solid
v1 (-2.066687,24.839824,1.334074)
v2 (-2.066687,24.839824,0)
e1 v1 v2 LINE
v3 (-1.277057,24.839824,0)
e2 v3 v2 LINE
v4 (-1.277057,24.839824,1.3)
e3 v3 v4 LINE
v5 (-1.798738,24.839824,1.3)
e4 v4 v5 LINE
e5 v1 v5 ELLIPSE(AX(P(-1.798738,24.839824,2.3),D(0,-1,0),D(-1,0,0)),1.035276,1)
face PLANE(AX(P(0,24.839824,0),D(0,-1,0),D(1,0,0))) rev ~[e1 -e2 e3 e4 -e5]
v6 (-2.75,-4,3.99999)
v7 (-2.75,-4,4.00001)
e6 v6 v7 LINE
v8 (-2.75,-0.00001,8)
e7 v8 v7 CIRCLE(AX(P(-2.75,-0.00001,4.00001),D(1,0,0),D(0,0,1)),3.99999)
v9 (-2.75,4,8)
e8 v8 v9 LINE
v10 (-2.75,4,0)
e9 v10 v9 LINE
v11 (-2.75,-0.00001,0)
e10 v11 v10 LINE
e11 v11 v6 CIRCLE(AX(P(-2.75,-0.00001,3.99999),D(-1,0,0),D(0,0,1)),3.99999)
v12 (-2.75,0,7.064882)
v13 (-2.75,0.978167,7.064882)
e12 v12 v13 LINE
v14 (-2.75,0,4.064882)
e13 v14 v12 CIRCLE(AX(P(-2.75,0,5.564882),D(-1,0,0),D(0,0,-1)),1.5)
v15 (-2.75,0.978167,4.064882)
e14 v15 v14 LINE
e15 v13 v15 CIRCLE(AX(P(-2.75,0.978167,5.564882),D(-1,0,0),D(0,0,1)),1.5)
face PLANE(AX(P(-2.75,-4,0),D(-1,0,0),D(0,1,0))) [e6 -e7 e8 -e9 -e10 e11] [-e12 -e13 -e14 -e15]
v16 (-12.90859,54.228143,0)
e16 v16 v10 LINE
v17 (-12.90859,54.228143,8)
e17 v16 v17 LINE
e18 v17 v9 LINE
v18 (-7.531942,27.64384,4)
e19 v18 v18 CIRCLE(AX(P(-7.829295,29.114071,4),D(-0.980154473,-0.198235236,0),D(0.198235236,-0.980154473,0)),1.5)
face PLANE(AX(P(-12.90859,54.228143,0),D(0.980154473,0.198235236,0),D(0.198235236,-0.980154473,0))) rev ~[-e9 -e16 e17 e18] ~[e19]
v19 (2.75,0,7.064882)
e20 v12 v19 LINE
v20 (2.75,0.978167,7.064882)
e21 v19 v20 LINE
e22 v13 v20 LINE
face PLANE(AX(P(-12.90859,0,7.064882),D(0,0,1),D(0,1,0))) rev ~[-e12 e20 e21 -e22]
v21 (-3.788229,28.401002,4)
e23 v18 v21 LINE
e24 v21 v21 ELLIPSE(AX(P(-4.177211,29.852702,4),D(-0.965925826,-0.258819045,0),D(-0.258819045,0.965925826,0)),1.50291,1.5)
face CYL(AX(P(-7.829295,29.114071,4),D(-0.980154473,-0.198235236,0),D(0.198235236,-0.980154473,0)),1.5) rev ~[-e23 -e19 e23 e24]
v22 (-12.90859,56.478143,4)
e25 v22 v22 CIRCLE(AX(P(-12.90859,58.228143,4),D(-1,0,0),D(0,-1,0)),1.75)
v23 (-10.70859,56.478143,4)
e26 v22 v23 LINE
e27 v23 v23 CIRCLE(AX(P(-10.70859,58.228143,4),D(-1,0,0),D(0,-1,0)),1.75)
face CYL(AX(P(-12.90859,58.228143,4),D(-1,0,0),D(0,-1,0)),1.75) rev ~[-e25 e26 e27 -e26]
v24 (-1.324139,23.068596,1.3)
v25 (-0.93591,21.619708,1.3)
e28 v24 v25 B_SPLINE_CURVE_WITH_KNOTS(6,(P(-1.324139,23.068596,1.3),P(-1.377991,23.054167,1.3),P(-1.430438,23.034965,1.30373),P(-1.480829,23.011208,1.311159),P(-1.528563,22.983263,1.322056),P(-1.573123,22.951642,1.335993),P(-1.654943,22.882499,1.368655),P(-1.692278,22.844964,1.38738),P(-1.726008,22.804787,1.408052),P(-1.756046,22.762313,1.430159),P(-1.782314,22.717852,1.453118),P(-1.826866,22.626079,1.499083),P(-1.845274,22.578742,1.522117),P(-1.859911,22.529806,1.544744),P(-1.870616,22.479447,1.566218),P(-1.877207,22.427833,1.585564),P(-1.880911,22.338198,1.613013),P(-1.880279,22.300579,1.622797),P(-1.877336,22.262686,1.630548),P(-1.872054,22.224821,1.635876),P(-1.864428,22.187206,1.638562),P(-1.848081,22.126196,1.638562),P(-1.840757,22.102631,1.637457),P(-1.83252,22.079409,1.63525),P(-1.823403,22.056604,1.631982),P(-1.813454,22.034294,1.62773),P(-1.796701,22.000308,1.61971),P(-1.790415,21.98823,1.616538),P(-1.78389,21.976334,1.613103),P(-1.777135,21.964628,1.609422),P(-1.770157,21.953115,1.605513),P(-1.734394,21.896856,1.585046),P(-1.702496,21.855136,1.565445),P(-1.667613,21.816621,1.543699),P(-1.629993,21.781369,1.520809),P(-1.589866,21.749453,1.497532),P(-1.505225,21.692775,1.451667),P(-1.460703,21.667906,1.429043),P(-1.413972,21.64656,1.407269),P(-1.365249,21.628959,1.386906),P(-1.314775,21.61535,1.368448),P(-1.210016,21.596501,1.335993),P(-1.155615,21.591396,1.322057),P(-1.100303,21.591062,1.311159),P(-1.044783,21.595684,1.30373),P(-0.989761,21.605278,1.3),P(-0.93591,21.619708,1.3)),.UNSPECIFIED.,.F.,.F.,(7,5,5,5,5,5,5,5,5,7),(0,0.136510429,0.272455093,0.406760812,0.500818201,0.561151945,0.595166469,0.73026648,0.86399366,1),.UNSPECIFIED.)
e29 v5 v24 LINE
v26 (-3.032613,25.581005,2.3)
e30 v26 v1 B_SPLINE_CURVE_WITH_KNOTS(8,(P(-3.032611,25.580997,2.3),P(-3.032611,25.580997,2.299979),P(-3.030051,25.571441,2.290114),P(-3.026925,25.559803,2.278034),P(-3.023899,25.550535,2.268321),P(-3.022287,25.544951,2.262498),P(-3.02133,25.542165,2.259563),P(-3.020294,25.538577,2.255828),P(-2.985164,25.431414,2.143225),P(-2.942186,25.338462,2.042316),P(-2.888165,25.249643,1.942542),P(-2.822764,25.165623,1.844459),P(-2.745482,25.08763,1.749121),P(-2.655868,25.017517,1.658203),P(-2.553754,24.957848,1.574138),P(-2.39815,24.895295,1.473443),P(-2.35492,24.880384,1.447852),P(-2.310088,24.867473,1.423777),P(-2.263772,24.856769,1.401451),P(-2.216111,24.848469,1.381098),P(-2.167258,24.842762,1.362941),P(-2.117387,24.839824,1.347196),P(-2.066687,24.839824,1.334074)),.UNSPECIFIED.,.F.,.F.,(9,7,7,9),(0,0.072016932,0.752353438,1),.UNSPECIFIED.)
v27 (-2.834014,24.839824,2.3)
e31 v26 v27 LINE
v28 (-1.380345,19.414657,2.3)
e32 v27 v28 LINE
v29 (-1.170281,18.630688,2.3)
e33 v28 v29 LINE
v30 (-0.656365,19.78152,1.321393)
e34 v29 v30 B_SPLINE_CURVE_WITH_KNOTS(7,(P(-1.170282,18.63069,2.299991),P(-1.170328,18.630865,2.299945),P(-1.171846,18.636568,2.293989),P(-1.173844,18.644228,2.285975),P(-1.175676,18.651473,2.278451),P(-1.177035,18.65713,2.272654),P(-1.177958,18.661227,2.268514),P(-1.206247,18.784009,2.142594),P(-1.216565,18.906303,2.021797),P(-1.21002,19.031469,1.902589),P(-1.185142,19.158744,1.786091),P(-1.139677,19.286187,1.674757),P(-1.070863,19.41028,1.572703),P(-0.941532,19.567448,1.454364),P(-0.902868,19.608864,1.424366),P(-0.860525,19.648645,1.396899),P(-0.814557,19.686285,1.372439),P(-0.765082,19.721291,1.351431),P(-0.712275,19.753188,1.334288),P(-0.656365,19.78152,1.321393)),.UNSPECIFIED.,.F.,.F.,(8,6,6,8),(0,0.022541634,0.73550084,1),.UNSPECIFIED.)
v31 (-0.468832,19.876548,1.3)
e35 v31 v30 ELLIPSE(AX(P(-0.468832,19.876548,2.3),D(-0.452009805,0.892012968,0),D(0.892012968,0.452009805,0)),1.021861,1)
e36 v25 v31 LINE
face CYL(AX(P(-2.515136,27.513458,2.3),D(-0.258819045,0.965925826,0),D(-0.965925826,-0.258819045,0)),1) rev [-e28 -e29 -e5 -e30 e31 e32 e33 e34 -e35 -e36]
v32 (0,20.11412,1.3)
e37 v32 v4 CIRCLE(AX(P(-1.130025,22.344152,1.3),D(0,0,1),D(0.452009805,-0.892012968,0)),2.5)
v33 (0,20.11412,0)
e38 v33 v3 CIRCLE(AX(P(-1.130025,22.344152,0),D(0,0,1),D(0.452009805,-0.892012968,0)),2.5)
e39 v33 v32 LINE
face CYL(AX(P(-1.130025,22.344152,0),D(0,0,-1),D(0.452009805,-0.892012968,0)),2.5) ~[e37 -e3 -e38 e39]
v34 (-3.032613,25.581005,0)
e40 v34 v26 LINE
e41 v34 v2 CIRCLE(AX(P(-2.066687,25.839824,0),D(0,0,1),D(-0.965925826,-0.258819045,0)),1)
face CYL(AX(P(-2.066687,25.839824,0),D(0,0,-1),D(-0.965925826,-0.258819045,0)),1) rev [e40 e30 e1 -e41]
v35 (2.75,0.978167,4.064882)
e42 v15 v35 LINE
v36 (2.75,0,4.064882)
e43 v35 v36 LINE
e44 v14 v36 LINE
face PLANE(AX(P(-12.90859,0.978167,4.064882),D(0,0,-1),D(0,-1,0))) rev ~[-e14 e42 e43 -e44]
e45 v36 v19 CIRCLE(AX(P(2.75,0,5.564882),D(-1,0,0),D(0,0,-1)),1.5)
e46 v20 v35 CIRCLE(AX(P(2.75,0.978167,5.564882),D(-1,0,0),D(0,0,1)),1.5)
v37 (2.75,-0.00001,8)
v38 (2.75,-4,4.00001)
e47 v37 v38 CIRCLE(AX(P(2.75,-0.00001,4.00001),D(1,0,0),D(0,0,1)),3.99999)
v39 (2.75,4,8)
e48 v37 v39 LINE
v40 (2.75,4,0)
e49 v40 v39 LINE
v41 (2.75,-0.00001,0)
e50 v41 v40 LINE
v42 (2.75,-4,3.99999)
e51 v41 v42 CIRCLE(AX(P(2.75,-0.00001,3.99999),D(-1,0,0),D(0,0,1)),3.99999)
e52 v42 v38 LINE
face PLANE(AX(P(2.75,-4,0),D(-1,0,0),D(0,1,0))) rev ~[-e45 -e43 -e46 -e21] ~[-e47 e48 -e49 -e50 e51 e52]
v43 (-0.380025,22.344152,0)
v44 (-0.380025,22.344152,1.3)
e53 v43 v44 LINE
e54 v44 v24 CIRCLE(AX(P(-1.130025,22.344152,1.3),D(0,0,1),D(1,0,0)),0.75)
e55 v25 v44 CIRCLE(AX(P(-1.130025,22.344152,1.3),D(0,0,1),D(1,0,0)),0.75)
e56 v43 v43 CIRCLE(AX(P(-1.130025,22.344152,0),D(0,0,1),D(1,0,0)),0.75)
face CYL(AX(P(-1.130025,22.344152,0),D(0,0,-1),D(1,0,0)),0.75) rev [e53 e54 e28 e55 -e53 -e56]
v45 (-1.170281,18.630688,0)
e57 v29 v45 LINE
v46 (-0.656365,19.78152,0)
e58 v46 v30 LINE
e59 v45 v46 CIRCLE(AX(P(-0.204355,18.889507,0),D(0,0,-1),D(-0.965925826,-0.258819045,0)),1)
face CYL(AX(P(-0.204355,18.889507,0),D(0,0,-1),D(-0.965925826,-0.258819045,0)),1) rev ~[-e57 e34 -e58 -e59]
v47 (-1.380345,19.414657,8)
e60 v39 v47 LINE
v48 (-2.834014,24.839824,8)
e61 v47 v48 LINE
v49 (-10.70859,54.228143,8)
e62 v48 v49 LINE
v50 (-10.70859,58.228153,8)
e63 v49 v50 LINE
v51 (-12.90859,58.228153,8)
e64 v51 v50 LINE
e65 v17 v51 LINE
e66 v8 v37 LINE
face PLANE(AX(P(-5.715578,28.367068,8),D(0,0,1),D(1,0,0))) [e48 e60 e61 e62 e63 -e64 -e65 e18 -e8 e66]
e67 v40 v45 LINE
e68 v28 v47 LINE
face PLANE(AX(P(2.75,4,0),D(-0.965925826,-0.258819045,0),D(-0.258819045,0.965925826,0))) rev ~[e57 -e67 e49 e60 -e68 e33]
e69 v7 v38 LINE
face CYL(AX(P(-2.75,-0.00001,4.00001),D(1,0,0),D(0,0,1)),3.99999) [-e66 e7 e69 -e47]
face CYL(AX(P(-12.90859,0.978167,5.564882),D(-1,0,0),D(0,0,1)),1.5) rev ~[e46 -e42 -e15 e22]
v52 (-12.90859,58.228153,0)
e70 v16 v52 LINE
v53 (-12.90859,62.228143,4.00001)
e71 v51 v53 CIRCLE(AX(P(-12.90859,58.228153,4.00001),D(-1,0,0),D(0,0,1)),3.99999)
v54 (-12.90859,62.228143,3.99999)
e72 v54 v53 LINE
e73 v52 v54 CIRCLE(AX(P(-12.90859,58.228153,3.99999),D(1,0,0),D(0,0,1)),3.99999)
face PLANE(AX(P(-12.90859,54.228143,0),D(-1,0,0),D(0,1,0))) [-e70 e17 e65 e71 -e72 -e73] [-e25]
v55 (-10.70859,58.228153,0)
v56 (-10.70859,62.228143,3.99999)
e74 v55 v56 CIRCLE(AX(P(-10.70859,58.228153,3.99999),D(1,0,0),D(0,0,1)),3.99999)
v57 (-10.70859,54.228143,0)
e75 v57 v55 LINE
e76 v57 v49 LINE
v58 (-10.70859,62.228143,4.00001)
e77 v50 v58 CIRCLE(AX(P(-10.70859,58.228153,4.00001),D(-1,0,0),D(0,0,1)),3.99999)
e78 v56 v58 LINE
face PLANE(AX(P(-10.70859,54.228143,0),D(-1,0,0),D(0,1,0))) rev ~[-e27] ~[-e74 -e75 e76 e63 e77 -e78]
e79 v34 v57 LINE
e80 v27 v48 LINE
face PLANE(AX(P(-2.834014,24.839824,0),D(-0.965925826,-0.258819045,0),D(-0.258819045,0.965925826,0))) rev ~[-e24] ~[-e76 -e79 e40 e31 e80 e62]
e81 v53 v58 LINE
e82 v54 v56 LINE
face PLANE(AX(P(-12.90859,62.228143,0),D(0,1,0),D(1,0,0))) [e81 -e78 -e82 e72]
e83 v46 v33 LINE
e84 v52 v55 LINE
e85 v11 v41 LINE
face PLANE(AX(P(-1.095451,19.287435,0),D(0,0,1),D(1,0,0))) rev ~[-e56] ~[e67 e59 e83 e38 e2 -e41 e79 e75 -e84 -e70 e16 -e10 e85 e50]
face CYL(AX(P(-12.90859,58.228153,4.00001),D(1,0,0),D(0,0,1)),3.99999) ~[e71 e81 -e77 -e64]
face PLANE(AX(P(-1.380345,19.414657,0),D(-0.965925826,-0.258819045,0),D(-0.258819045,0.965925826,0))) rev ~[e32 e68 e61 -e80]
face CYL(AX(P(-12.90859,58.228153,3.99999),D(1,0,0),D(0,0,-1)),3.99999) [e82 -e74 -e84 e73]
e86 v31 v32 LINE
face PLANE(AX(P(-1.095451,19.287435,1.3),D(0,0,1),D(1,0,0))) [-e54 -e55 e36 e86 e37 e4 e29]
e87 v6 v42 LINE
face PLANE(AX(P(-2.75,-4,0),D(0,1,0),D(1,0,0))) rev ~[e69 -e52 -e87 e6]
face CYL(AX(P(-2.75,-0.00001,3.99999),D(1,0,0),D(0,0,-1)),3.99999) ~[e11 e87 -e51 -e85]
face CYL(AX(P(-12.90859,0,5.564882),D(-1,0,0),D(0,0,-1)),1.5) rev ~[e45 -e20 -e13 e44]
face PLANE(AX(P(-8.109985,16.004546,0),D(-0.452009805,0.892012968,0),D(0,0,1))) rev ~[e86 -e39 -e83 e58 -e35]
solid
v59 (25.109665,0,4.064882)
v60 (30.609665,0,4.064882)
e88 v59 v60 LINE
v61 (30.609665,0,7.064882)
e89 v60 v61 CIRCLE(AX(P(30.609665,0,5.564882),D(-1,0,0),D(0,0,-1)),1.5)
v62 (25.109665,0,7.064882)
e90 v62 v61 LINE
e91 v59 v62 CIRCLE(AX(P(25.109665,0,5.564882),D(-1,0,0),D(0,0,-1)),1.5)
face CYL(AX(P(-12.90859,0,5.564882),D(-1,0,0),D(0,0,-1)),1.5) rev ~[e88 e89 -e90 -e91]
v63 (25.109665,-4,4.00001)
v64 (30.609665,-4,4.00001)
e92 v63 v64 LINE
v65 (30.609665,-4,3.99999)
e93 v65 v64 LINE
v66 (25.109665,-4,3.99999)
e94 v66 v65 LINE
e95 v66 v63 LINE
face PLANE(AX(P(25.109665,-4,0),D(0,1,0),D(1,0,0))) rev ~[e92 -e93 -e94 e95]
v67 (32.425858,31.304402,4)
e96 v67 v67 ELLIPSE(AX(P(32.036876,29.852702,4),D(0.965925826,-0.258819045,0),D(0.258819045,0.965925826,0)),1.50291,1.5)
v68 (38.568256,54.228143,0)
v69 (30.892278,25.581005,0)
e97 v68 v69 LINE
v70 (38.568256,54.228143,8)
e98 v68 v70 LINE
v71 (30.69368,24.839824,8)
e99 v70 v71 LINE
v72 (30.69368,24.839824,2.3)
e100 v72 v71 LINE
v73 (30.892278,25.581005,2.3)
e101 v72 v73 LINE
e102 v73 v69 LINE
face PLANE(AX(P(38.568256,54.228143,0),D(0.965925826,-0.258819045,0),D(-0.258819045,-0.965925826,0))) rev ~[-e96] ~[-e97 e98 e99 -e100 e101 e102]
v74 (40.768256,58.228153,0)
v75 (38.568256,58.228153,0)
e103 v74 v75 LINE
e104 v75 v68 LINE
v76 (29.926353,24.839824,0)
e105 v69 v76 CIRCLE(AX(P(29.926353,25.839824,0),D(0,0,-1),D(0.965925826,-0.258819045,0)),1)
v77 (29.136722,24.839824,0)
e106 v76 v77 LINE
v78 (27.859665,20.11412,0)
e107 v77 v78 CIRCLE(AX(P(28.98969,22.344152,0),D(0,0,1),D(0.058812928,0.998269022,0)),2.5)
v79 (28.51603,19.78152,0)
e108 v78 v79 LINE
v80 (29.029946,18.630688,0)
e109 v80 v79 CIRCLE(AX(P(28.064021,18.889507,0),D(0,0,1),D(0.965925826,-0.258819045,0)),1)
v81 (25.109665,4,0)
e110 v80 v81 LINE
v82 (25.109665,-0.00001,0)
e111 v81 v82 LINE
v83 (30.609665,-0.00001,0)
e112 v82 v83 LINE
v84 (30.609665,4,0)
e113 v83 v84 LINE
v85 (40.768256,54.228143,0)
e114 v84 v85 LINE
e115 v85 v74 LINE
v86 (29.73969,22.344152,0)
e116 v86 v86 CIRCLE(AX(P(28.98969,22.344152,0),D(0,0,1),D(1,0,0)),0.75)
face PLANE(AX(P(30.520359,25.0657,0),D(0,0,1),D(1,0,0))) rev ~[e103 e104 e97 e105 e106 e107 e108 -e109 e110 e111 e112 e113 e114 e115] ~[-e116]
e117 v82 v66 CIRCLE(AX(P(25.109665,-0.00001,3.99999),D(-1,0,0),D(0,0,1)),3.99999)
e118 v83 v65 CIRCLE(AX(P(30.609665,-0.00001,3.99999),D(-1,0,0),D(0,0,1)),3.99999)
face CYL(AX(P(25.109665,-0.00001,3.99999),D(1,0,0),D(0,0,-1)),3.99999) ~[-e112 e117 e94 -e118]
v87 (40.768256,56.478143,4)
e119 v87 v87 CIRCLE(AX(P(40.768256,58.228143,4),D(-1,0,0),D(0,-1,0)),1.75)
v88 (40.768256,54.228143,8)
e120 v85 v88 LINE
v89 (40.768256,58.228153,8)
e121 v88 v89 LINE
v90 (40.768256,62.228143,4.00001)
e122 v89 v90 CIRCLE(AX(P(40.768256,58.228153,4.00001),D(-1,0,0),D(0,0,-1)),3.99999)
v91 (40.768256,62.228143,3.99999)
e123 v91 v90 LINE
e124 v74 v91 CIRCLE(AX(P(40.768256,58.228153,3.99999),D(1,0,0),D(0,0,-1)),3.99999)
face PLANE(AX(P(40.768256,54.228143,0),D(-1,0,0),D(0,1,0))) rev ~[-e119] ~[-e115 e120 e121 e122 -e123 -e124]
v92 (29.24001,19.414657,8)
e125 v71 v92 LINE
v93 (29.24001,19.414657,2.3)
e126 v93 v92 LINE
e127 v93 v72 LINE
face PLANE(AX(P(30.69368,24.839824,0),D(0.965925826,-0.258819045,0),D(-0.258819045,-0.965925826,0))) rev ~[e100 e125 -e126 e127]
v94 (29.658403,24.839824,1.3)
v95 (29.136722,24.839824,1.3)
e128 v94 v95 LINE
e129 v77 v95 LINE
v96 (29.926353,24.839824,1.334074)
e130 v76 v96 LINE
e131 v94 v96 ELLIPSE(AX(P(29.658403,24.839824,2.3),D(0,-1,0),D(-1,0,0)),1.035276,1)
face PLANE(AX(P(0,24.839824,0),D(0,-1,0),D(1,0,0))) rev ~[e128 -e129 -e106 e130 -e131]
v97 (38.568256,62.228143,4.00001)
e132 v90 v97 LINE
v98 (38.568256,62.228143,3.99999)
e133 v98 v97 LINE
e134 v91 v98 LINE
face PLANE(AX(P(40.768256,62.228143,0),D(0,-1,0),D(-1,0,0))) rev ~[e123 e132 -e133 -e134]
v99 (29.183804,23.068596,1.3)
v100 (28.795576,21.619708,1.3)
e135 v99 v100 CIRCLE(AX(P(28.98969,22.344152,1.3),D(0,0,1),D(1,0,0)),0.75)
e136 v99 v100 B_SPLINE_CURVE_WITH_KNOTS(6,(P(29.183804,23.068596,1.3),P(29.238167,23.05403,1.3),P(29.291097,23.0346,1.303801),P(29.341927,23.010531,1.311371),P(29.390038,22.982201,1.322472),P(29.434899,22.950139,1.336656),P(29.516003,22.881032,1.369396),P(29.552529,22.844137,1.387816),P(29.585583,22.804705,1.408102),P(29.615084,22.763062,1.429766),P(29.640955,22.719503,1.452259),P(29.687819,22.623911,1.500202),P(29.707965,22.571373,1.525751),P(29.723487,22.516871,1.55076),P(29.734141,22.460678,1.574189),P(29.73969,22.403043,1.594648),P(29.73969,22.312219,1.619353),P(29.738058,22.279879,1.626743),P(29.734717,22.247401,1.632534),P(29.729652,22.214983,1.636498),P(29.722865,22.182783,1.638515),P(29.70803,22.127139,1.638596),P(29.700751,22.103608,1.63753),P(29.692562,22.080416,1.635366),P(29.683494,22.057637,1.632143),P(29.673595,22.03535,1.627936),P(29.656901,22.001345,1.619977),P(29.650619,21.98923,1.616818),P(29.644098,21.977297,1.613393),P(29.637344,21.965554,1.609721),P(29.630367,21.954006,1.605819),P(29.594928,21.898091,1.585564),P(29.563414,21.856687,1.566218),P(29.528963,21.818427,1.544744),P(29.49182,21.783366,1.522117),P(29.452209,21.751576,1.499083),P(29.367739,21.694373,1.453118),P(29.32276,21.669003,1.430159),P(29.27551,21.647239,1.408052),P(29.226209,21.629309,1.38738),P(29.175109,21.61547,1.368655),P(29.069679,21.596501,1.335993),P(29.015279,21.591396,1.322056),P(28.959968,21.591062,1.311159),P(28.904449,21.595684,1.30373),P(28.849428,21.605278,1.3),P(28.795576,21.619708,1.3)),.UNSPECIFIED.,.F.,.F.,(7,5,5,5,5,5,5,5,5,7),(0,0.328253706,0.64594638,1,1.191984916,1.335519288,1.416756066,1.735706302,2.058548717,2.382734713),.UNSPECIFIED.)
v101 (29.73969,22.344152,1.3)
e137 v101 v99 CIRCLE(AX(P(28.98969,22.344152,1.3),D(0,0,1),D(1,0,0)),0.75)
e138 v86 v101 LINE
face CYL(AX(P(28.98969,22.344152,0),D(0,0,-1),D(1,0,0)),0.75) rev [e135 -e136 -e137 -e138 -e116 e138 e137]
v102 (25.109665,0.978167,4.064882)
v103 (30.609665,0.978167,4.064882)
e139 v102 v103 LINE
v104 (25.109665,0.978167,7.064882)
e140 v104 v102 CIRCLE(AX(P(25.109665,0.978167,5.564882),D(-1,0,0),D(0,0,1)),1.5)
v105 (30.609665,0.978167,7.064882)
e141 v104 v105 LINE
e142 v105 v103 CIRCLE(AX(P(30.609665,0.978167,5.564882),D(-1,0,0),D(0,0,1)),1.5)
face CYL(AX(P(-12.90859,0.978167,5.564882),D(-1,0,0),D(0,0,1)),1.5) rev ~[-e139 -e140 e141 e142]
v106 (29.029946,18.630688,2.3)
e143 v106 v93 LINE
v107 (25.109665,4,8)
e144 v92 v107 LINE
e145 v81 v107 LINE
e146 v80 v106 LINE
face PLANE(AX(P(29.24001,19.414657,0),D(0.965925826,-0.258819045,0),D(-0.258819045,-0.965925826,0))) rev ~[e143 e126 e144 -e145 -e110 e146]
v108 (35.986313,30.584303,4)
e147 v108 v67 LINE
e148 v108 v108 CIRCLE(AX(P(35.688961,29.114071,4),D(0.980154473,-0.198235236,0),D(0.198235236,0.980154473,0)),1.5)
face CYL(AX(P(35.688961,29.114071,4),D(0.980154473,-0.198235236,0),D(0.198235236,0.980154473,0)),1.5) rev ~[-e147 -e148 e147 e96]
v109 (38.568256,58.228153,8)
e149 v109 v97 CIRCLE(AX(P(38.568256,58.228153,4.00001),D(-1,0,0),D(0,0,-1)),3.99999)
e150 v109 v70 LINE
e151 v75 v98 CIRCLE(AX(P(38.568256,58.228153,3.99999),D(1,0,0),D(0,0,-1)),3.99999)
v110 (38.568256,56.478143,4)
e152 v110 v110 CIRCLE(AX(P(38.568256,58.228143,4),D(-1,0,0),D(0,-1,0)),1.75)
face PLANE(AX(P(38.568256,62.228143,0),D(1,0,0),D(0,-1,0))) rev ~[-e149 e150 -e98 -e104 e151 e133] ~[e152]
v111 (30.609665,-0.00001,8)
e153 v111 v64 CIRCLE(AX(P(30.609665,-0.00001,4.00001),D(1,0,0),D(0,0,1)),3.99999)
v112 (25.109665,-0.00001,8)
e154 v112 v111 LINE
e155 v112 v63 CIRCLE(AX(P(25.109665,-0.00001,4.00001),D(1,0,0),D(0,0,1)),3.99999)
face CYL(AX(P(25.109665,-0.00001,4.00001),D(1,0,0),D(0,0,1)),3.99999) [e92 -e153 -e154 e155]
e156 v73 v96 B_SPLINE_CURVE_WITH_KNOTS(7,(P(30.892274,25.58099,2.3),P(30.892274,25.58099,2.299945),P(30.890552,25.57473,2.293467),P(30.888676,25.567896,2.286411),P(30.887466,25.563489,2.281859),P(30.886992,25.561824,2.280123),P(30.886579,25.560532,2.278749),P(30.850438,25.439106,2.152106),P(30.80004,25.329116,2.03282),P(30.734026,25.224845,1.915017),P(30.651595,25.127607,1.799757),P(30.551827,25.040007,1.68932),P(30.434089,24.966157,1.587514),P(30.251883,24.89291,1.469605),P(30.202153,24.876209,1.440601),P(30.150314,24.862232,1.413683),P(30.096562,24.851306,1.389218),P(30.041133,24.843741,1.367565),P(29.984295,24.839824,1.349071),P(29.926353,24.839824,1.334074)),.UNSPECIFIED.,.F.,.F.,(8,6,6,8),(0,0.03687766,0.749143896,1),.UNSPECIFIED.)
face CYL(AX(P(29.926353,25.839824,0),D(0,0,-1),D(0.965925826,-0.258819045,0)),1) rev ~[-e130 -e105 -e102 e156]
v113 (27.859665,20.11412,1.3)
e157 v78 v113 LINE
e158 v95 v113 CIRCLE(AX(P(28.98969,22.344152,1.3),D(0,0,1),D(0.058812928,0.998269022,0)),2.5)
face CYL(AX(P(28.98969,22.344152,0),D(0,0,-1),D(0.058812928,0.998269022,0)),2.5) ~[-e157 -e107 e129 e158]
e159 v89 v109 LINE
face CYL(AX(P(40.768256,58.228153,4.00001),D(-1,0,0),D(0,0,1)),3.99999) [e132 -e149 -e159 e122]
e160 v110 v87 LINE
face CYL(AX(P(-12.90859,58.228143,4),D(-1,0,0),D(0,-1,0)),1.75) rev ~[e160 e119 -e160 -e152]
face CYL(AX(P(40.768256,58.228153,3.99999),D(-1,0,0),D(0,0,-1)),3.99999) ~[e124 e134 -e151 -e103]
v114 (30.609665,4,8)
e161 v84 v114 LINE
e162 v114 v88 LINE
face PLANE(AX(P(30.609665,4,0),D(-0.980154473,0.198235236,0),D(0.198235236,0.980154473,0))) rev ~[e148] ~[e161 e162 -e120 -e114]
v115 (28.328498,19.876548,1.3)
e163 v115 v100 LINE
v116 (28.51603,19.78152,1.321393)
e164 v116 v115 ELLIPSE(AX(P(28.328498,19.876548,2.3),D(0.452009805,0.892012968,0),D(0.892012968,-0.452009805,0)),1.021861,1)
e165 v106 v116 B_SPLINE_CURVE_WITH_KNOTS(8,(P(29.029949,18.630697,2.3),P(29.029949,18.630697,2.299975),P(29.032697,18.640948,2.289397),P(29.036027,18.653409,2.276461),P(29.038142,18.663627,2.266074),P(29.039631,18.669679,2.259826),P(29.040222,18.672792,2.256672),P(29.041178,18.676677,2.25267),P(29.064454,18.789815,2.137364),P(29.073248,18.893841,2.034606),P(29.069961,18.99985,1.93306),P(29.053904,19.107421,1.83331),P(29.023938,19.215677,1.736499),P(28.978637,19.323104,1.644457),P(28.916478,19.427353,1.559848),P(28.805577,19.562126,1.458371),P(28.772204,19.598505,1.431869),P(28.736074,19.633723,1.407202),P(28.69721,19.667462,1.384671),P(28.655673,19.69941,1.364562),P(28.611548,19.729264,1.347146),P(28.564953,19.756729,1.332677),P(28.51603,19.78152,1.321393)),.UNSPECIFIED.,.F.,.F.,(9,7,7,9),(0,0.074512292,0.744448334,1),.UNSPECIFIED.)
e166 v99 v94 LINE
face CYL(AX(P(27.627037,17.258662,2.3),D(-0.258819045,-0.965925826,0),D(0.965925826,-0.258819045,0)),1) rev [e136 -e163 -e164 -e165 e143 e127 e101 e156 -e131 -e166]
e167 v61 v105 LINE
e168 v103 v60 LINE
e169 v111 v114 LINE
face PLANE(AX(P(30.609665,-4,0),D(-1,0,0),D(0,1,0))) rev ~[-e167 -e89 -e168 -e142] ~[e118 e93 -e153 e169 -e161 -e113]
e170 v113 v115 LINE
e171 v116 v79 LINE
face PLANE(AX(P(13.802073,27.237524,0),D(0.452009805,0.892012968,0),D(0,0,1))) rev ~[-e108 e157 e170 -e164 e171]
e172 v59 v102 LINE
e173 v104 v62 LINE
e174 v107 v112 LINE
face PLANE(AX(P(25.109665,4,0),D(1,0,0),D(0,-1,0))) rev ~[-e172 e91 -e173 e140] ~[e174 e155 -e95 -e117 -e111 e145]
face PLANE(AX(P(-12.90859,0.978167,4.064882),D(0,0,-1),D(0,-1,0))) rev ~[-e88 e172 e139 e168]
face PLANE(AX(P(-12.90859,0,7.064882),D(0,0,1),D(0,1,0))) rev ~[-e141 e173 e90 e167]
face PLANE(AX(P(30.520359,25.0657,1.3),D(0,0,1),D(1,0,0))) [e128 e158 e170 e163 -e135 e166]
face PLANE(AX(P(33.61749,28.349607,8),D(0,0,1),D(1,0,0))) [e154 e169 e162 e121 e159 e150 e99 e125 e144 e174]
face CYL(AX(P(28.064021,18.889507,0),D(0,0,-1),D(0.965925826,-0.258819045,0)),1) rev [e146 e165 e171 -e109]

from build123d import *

# Parameters (mm, degrees)
F1_DEPTH        = 8
F0_W            = 2.2
F0_H            = 8
F0_W_2          = 5.5
F0_R            = 0.75
F2_DEPTH        = 1.3
F3_R            = 1.75
F4_DEPTH        = 53.6778461441
F5_R            = 1.5
F6_DEPTH        = 25
F7_R            = 1.5
F8_DEPTH        = 25
F9_R            = 3.99999
F9_2_R          = 3.99999
F10_T1_DEPTH    = 1.3
F10_T6_DEPTH    = 10.6165464639
F10_S9_R        = 0.75
F10_T10_DEPTH   = 7
F10_T15_DEPTH   = 10.6165464639
F10_T19_DEPTH   = 3.3290625116
F10_T26_DEPTH   = 3.2183174699
F10_T30_DEPTH   = 10.6165464639
F10_2_T1_DEPTH  = 1.3
F10_2_T6_DEPTH  = 10.6165464639
F10_2_S9_R      = 0.75
F10_2_T10_DEPTH = 7
F10_2_T15_DEPTH = 3.3290625116
F10_2_T19_DEPTH = 10.6165464639
F10_2_T26_DEPTH = 10.6165464639
F10_2_T30_DEPTH = 3.2183174699


# Not quite as in the source:
# - a fillet or chamfer that OpenCascade refuses, or shapes differently, is made with other operations: its cross-section is extruded or revolved along the edge and cut away or added
# - a fillet or chamfer is up to 0.001 mm smaller than in the source, because OpenCascade refuses the exact size


with BuildPart() as f1:
    # F0 (on Top) → F1 (new body)
    with BuildSketch(Plane.XY):
        Polygon((38.5682557988, 62.228142967), (38.5682557988, 54.228142967), (30.6936795925, 24.8398244771), (29.2400103999, 19.414657193), (25.1096654534, 4), (25.1096654534, -4), (30.6096654534, -4), (30.6096654534, 4), (40.7682557988, 54.228142967), (40.7682557988, 62.228142967), align=None)
    extrude(amount=F1_DEPTH)

    # F0 (on Top) → F2, piece 2 (join)
    with BuildSketch(Plane.XY):
        with BuildLine():
            Line((29.2400103999, 19.414657193), (30.6936795925, 24.8398244771))
            Line((30.6936795925, 24.8398244771), (29.1367222868, 24.8398244771))
            ThreePointArc((29.1367222868, 24.8398244771), (26.5762608106, 22.9963479894), (27.8596654534, 20.1141195019))
            Line((27.8596654534, 20.1141195019), (29.2400103999, 19.414657193))
        make_face()
        with Locations((28.9896899666, 22.3441519231)):
            Circle(F0_R, mode=Mode.SUBTRACT)
    extrude(amount=F2_DEPTH)


with BuildPart() as f1b:
    # F0 (on Top) → F1, piece 2 (new body)
    with BuildSketch(Plane.XY):
        Polygon((-2.75, 4), (2.75, 4), (-1.3803449465, 19.414657193), (-2.834014139, 24.8398244771), (-10.7085903453, 54.228142967), (-12.9085903453, 54.228142967), align=None)
        with Locations((-11.8085903453, 58.228142967)):
            Rectangle(F0_W, F0_H)
        Rectangle(F0_W_2, F0_H)
    extrude(amount=F1_DEPTH)

    # F0 (on Top) → F2 (join)
    with BuildSketch(Plane.XY):
        with BuildLine():
            Line((-2.834014139, 24.8398244771), (-1.3803449465, 19.414657193))
            Line((-1.3803449465, 19.414657193), (0, 20.1141195019))
            ThreePointArc((0, 20.1141195019), (1.2834046428, 22.9963479894), (-1.2770568333, 24.8398244771))
            Line((-1.2770568333, 24.8398244771), (-2.834014139, 24.8398244771))
        make_face()
        with Locations((-1.1300245132, 22.3441519231)):
            Circle(F0_R, mode=Mode.SUBTRACT)
    extrude(amount=F2_DEPTH)


with BuildPart() as f4_tool:
    # F3 (on face) → F4 (new body, through all)
    with BuildSketch(Plane(origin=(-12.9085903453, 0, 0), x_dir=(0, -1, 0), z_dir=(-1, 0, 0))):
        with BuildLine():
            Line((-0.9781668196, 4.0648819543), (0, 4.0648819543))
            ThreePointArc((0, 4.0648819543), (1.5, 5.5648819543), (0, 7.0648819543))
            Line((0, 7.0648819543), (-0.9781668196, 7.0648819543))
            ThreePointArc((-0.9781668196, 7.0648819543), (-2.4781668196, 5.5648819543), (-0.9781668196, 4.0648819543))
        make_face()
        with Locations((-58.228142967, 4)):
            Circle(F3_R)
    extrude(amount=-F4_DEPTH)


with BuildPart() as f1_1:
    add(f1.part)

    # F4: cut by f4_tool
    add(f4_tool.part, mode=Mode.SUBTRACT)

    # F7 (on face) → F8 (cut)
    with BuildSketch(Plane(origin=(28.629586428, -5.7903044608, 0), x_dir=(0.1982352359, 0.9801544732, 0), z_dir=(0.9801544732, -0.1982352359, 0))):
        with Locations((35.611096924, 4)):
            Circle(F7_R)
    extrude(amount=-F8_DEPTH, mode=Mode.SUBTRACT)

    # F9 (radius 4 in the source; OpenCascade refuses exactly that, so slightly less here)
    f9_edges = [f1_1.edges().sort_by_distance(p)[0] for p in [
        (27.859665, -4, 8),
        (39.668256, 62.228143, 8),
        (39.668256, 62.228143, 0),
        (27.859665, -4, 0),
    ]]
    fillet(f9_edges, radius=F9_R)

    # F10: fillet of radius 1 on 3 edges, made by hand

    # F10_s2 → F10_t1 (join)
    with BuildSketch(Plane.XY):
        with BuildLine():
            ThreePointArc((30.8922784308, 25.581005432), (30.5351140335, 25.0464711368), (29.9263526045, 24.8398244771))
            Line((29.9263526045, 24.8398244771), (30.6936795925, 24.8398244771))
            Line((30.6936795925, 24.8398244771), (30.8922784308, 25.581005432))
        make_face()
        with BuildLine():
            ThreePointArc((29.0299463912, 18.6306876398), (28.9771136296, 19.2972579023), (28.5160303702, 19.7815196533))
            Line((28.5160303702, 19.7815196533), (29.2400103999, 19.414657193))
            Line((29.2400103999, 19.414657193), (29.0299463912, 18.6306876398))
        make_face()
    extrude(amount=F10_T1_DEPTH)


with BuildPart() as f1b_1:
    add(f1b.part)

    # F4: cut by f4_tool
    add(f4_tool.part, mode=Mode.SUBTRACT)

    # F5 (on face) → F6 (cut)
    with BuildSketch(Plane(origin=(-1.8647280633, -0.3771393363, 0), x_dir=(0.1982352359, -0.9801544732, 0), z_dir=(-0.9801544732, -0.1982352359, 0))):
        with Locations((-30.0883295718, 4)):
            Circle(F5_R)
    extrude(amount=-F6_DEPTH, mode=Mode.SUBTRACT)

    # F9#2 (radius 4 in the source; OpenCascade refuses exactly that, so slightly less here)
    f9_2_edges = [f1b_1.edges().sort_by_distance(p)[0] for p in [
        (-11.80859, 62.228143, 8),
        (0, -4, 8),
        (-11.80859, 62.228143, 0),
        (0, -4, 0),
    ]]
    fillet(f9_2_edges, radius=F9_2_R)

    # F10#2: fillet of radius 1 on 3 edges, made by hand

    # F10_2_s2 → F10_2_t1 (join)
    with BuildSketch(Plane.XY):
        with BuildLine():
            ThreePointArc((-1.1702809378, 18.6306876398), (-1.1174481761, 19.2972579023), (-0.6563649168, 19.7815196533))
            Line((-0.6563649168, 19.7815196533), (-1.3803449465, 19.414657193))
            Line((-1.3803449465, 19.414657193), (-1.1702809378, 18.6306876398))
        make_face()
        with BuildLine():
            ThreePointArc((-3.0326129774, 25.581005432), (-2.6754485801, 25.0464711368), (-2.0666871511, 24.8398244771))
            Line((-2.0666871511, 24.8398244771), (-2.834014139, 24.8398244771))
            Line((-2.834014139, 24.8398244771), (-3.0326129774, 25.581005432))
        make_face()
    extrude(amount=F10_2_T1_DEPTH)


with BuildPart() as f10_tool4:
    # F10_s5 → F10_t6 (new body)
    with BuildSketch(Plane(origin=(6.1653259788, 23.0093097982, 0), x_dir=(0, 0, 1), z_dir=(0.2588190451, 0.9659258263, 0))):
        with BuildLine():
            ThreePointArc((2.3, 23.2187981705), (1.5928932188, 22.9259049517), (1.3, 22.2187981705))
            Line((1.3, 22.2187981705), (1.3, 23.2187981705))
            Line((1.3, 23.2187981705), (2.3, 23.2187981705))
        make_face()
    extrude(amount=F10_T6_DEPTH)

    split(bisect_by=Plane.XZ.offset(-24.8398244771), keep=Keep.TOP)

    split(bisect_by=Plane(origin=(13.8020730291, 27.2375244736, 0), x_dir=(0, 0, 1), z_dir=(0.4520098053, 0.8920129685, 0)), keep=Keep.TOP)

    # F10_s9 → F10_t10 (cut, symmetric)
    with BuildSketch(Plane.XY.offset(1.8)):
        with Locations((28.9896899666, 22.3441519231)):
            Circle(F10_S9_R)
    extrude(amount=F10_T10_DEPTH, both=True, mode=Mode.SUBTRACT)


with BuildPart() as f1_2:
    add(f1_1.part)

    # F10_t3: union F10_tool4
    add(f10_tool4.part)


with BuildPart() as f10_tool13:
    # F10_s14 → F10_t15 (new body)
    with BuildSketch(Plane(origin=(6.1653259788, 23.0093097982, 0), x_dir=(0, 0, 1), z_dir=(0.2588190451, 0.9659258263, 0))):
        with BuildLine():
            ThreePointArc((2.3, 23.2187981705), (1.5928932188, 22.9259049517), (1.3, 22.2187981705))
            Line((1.3, 22.2187981705), (1.3, 23.2187981705))
            Line((1.3, 23.2187981705), (2.3, 23.2187981705))
        make_face()
    extrude(amount=F10_T15_DEPTH)

    split(bisect_by=Plane(origin=(13.8020730291, 27.2375244736, 0), x_dir=(0, 0, 1), z_dir=(-0.4520098053, -0.8920129685, 0)), keep=Keep.TOP)


with BuildPart() as f10_tool17:
    # F10_s18 → F10_t19 (new body)
    with BuildSketch(Plane.XY):
        with BuildLine():
            ThreePointArc((29.0299463912, 18.6306876398), (28.9771136296, 19.2972579023), (28.5160303702, 19.7815196533))
            Line((28.5160303702, 19.7815196533), (29.2400103999, 19.414657193))
            Line((29.2400103999, 19.414657193), (29.0299463912, 18.6306876398))
        make_face()
    extrude(amount=F10_T19_DEPTH)

    split(bisect_by=Plane.XY.offset(1.3), keep=Keep.TOP)


with BuildPart() as f10_tool13_1:
    add(f10_tool13.part)

    # F10_t21: intersect F10_tool17
    add(f10_tool17.part, mode=Mode.INTERSECT)


with BuildPart() as f1_3:
    add(f1_2.part)

    # F10_t11: union F10_tool13
    add(f10_tool13_1.part)


with BuildPart() as f10_tool24:
    # F10_s25 → F10_t26 (new body)
    with BuildSketch(Plane.XY):
        with BuildLine():
            ThreePointArc((30.8922784308, 25.581005432), (30.5351140335, 25.0464711368), (29.9263526045, 24.8398244771))
            Line((29.9263526045, 24.8398244771), (30.6936795925, 24.8398244771))
            Line((30.6936795925, 24.8398244771), (30.8922784308, 25.581005432))
        make_face()
    extrude(amount=F10_T26_DEPTH)

    split(bisect_by=Plane.XY.offset(1.3), keep=Keep.TOP)


with BuildPart() as f10_tool28:
    # F10_s29 → F10_t30 (new body)
    with BuildSketch(Plane(origin=(6.1653259788, 23.0093097982, 0), x_dir=(0, 0, 1), z_dir=(0.2588190451, 0.9659258263, 0))):
        with BuildLine():
            ThreePointArc((2.3, 23.2187981705), (1.5928932188, 22.9259049517), (1.3, 22.2187981705))
            Line((1.3, 22.2187981705), (1.3, 23.2187981705))
            Line((1.3, 23.2187981705), (2.3, 23.2187981705))
        make_face()
    extrude(amount=F10_T30_DEPTH)

    split(bisect_by=Plane.XZ.offset(-24.8398244771), keep=Keep.BOTTOM)


with BuildPart() as f10_tool24_1:
    add(f10_tool24.part)

    # F10_t32: intersect F10_tool28
    add(f10_tool28.part, mode=Mode.INTERSECT)


with BuildPart() as f1_4:
    add(f1_3.part)

    # F10_t22: union F10_tool24
    add(f10_tool24_1.part)


with BuildPart() as f10_2_tool4:
    # F10_2_s5 → F10_2_t6 (new body)
    with BuildSketch(Plane(origin=(-7.046846682, 26.2991898504, 0), x_dir=(0, 0, 1), z_dir=(0.2588190451, -0.9659258263, 0))):
        with BuildLine():
            ThreePointArc((2.3, -3.6915722027), (1.5928932188, -3.9844654215), (1.3, -4.6915722027))
            Line((1.3, -4.6915722027), (1.3, -3.6915722027))
            Line((1.3, -3.6915722027), (2.3, -3.6915722027))
        make_face()
    extrude(amount=F10_2_T6_DEPTH)

    split(bisect_by=Plane(origin=(-8.1099849882, 16.0045461381, 0), x_dir=(0, 0, 1), z_dir=(-0.4520098053, 0.8920129685, 0)), keep=Keep.TOP)

    split(bisect_by=Plane.XZ.offset(-24.8398244771), keep=Keep.TOP)

    # F10_2_s9 → F10_2_t10 (cut, symmetric)
    with BuildSketch(Plane.XY.offset(1.8)):
        with Locations((-1.1300245132, 22.3441519231)):
            Circle(F10_2_S9_R)
    extrude(amount=F10_2_T10_DEPTH, both=True, mode=Mode.SUBTRACT)


with BuildPart() as f1b_2:
    add(f1b_1.part)

    # F10_2_t3: union F10_2_tool4
    add(f10_2_tool4.part)


with BuildPart() as f10_2_tool13:
    # F10_2_s14 → F10_2_t15 (new body)
    with BuildSketch(Plane.XY):
        with BuildLine():
            ThreePointArc((-1.1702809378, 18.6306876398), (-1.1174481761, 19.2972579023), (-0.6563649168, 19.7815196533))
            Line((-0.6563649168, 19.7815196533), (-1.3803449465, 19.414657193))
            Line((-1.3803449465, 19.414657193), (-1.1702809378, 18.6306876398))
        make_face()
    extrude(amount=F10_2_T15_DEPTH)

    split(bisect_by=Plane.XY.offset(1.3), keep=Keep.TOP)


with BuildPart() as f10_2_tool17:
    # F10_2_s18 → F10_2_t19 (new body)
    with BuildSketch(Plane(origin=(-7.046846682, 26.2991898504, 0), x_dir=(0, 0, 1), z_dir=(0.2588190451, -0.9659258263, 0))):
        with BuildLine():
            ThreePointArc((2.3, -3.6915722027), (1.5928932188, -3.9844654215), (1.3, -4.6915722027))
            Line((1.3, -4.6915722027), (1.3, -3.6915722027))
            Line((1.3, -3.6915722027), (2.3, -3.6915722027))
        make_face()
    extrude(amount=F10_2_T19_DEPTH)

    split(bisect_by=Plane(origin=(-8.1099849882, 16.0045461381, 0), x_dir=(0, 0, 1), z_dir=(0.4520098053, -0.8920129685, 0)), keep=Keep.TOP)


with BuildPart() as f10_2_tool13_1:
    add(f10_2_tool13.part)

    # F10_2_t21: intersect F10_2_tool17
    add(f10_2_tool17.part, mode=Mode.INTERSECT)


with BuildPart() as f1b_3:
    add(f1b_2.part)

    # F10_2_t11: union F10_2_tool13
    add(f10_2_tool13_1.part)


with BuildPart() as f10_2_tool24:
    # F10_2_s25 → F10_2_t26 (new body)
    with BuildSketch(Plane(origin=(-7.046846682, 26.2991898504, 0), x_dir=(0, 0, 1), z_dir=(0.2588190451, -0.9659258263, 0))):
        with BuildLine():
            ThreePointArc((2.3, -3.6915722027), (1.5928932188, -3.9844654215), (1.3, -4.6915722027))
            Line((1.3, -4.6915722027), (1.3, -3.6915722027))
            Line((1.3, -3.6915722027), (2.3, -3.6915722027))
        make_face()
    extrude(amount=F10_2_T26_DEPTH)

    split(bisect_by=Plane.XZ.offset(-24.8398244771), keep=Keep.BOTTOM)


with BuildPart() as f10_2_tool28:
    # F10_2_s29 → F10_2_t30 (new body)
    with BuildSketch(Plane.XY):
        with BuildLine():
            ThreePointArc((-3.0326129774, 25.581005432), (-2.6754485801, 25.0464711368), (-2.0666871511, 24.8398244771))
            Line((-2.0666871511, 24.8398244771), (-2.834014139, 24.8398244771))
            Line((-2.834014139, 24.8398244771), (-3.0326129774, 25.581005432))
        make_face()
    extrude(amount=F10_2_T30_DEPTH)

    split(bisect_by=Plane.XY.offset(1.3), keep=Keep.TOP)


with BuildPart() as f10_2_tool24_1:
    add(f10_2_tool24.part)

    # F10_2_t32: intersect F10_2_tool28
    add(f10_2_tool28.part, mode=Mode.INTERSECT)


with BuildPart() as f1b_4:
    add(f1b_3.part)

    # F10_2_t22: union F10_2_tool24
    add(f10_2_tool24_1.part)


solid = Compound([f1_4.part, f1b_4.part])
